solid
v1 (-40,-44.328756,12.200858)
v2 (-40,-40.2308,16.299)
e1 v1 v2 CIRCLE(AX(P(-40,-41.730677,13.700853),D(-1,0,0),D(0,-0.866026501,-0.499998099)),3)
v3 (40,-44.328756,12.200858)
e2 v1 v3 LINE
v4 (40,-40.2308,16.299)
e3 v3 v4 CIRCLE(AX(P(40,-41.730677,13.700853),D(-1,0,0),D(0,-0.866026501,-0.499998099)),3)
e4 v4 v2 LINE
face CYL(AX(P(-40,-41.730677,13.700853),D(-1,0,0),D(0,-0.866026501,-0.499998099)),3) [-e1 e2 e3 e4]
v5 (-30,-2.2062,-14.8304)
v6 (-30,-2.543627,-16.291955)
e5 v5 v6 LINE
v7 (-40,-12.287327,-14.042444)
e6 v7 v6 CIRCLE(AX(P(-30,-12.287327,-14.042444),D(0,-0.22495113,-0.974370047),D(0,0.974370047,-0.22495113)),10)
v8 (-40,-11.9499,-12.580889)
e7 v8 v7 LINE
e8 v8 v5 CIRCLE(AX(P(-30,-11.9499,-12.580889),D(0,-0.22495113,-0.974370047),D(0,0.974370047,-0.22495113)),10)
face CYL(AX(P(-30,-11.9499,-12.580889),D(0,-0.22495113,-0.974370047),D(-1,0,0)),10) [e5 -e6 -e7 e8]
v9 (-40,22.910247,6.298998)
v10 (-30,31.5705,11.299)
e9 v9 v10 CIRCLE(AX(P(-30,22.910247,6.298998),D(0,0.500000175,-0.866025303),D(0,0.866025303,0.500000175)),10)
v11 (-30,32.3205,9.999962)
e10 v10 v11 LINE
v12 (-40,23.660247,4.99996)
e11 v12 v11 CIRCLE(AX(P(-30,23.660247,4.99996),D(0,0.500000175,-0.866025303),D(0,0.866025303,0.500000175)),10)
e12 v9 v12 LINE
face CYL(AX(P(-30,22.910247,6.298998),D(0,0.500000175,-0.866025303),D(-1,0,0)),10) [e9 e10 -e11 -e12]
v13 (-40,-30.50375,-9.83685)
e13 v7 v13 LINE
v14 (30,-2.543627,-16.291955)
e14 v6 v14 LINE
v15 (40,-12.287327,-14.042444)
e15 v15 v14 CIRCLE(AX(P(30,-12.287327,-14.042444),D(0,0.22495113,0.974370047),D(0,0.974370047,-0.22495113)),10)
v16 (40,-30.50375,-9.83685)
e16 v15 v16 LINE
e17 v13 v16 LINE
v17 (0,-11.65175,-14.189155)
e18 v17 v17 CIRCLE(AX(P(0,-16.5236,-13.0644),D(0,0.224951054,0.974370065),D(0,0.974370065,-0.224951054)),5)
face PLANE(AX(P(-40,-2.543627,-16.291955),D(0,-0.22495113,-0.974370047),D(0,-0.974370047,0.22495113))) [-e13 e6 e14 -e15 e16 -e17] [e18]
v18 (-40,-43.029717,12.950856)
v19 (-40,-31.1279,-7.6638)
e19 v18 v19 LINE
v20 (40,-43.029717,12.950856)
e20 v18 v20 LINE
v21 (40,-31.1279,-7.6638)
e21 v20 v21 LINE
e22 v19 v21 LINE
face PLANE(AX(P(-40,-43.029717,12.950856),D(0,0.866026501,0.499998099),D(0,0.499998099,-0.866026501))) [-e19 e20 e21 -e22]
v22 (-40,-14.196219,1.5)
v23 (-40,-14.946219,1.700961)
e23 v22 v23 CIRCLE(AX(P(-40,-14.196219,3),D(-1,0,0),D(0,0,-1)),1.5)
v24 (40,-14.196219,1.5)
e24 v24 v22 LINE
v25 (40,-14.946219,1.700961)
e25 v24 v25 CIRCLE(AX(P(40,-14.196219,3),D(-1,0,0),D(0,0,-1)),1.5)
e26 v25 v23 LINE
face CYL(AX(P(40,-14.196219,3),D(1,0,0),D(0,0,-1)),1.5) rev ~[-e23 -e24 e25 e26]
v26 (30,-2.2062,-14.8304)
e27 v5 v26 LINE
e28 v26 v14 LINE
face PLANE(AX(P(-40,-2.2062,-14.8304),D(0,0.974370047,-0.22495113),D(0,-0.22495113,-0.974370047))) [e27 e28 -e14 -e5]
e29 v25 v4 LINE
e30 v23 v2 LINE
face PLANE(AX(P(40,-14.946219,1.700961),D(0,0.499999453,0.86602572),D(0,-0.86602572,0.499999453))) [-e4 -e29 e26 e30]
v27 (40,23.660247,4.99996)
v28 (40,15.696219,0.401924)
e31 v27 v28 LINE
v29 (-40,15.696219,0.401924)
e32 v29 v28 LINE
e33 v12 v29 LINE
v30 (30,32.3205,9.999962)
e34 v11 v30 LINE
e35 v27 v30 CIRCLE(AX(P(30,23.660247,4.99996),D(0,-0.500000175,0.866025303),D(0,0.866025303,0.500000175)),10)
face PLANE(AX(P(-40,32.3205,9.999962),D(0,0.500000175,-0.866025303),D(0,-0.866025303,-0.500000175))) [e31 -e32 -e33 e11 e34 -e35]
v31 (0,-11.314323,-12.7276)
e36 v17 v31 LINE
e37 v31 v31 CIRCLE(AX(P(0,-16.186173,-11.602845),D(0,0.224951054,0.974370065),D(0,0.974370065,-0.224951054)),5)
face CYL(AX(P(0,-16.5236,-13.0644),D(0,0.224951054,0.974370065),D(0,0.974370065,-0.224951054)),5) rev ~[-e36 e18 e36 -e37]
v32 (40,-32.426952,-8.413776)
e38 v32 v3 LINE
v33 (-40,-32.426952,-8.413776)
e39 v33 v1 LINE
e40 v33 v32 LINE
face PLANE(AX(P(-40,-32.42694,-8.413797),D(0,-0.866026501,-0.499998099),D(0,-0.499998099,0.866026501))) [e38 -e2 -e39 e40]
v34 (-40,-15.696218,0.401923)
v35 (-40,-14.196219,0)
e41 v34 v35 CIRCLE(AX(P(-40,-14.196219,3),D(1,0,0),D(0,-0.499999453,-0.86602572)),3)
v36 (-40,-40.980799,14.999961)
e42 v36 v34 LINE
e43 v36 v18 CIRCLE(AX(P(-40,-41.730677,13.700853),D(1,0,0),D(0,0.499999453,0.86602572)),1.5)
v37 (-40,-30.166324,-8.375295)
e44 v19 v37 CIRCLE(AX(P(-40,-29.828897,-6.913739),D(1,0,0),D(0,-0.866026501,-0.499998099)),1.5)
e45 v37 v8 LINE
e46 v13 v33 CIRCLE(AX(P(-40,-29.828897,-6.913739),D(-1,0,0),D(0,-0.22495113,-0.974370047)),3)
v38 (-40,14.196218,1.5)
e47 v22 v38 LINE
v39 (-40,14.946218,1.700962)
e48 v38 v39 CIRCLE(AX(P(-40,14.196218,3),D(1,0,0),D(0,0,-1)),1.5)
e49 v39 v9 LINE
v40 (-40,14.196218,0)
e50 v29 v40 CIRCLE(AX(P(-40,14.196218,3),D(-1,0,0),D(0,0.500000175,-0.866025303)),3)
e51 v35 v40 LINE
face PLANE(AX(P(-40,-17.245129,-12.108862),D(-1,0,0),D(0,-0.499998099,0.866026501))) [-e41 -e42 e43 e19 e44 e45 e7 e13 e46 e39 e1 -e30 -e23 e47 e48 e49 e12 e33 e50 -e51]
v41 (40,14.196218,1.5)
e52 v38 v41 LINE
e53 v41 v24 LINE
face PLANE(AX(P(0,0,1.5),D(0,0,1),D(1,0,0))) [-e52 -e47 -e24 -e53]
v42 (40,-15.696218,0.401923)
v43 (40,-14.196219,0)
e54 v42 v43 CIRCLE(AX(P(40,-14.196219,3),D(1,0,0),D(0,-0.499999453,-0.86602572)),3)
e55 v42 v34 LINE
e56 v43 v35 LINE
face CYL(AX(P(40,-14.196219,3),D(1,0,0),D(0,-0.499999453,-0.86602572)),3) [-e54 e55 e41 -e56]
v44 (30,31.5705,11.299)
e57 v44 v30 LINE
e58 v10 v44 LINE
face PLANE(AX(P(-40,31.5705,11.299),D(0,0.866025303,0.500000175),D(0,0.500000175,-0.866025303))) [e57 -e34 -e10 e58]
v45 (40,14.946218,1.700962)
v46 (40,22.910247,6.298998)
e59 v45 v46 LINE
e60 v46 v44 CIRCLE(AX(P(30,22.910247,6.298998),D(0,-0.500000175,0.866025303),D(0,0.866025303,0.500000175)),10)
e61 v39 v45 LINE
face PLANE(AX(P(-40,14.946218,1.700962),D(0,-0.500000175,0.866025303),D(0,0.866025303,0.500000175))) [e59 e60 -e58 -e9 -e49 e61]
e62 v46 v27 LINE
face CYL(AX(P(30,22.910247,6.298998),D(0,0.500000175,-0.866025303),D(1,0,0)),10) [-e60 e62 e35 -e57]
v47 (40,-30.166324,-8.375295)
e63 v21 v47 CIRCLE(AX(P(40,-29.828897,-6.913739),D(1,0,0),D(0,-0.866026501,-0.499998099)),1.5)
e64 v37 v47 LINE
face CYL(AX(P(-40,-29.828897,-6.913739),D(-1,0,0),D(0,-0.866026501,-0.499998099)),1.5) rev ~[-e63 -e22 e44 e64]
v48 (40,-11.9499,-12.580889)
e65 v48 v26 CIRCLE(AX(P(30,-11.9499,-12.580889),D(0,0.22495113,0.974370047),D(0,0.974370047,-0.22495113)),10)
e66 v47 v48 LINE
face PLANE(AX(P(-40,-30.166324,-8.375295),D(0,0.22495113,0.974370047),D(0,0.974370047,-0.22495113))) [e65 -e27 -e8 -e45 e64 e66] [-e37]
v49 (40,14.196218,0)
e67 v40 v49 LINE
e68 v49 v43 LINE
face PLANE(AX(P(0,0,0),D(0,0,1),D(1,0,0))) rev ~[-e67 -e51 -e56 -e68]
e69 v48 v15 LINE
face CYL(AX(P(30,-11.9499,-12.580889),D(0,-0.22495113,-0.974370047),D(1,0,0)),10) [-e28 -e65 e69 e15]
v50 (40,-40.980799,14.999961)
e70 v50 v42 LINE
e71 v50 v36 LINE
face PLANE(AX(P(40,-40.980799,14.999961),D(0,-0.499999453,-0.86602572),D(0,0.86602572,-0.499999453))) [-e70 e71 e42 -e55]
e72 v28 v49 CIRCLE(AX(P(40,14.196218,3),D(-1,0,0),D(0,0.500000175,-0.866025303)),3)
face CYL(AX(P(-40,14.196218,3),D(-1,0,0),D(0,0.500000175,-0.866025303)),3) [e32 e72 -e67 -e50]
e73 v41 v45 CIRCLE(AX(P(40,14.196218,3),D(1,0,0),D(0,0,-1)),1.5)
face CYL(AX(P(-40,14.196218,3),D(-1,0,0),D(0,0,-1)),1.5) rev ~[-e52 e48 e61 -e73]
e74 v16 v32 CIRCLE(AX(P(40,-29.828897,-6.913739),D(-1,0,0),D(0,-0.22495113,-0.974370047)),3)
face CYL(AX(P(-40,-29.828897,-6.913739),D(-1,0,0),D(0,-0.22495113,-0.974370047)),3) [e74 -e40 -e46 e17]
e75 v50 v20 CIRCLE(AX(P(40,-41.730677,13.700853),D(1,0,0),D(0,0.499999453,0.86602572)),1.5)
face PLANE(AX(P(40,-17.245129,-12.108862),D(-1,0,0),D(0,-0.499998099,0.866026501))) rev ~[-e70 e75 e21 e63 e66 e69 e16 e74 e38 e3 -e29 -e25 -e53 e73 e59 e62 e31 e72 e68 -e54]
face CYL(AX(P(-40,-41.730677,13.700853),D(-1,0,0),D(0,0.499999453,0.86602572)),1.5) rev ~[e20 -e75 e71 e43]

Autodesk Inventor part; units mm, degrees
ref_plane "YZ Plane" through (0, 0, 0) normal (1, 0, 0) x (0, 1, 0)
ref_plane "XZ Plane" through (0, 0, 0) normal (0, 1, 0) x (-1, 0, 0)
ref_plane "XY Plane" through (0, 0, 0) normal (0, 0, 1) x (1, 0, 0)
sketch "Schizzo1" plane through (0, 0, 0) normal (0, 0, 1) x (1, 0, 0)
  line L0 (-40, 15) -> (40, 15)
  line L1 (40, 15) -> (40, -15)
  line L2 (40, -15) -> (-40, -15)
  line L3 (-40, -15) -> (-40, 15)
  line L4 (-40, 15) -> (40, -15) construction
  line L5 (40, 15) -> (-40, -15) construction
  point P0 (0, 0)
  dimension "d0" = 80
  dimension "d1" = 30
extrude "Piano1" add sketch "Schizzo1" along normal blind 1.5
sketch "Schizzo2" plane through (40, -14.25, 1.299) normal (0, -0.5, -0.8660254) x (1, 0, 0)
  line L0 (-80, 0) -> (0, 0)
  line L1 (0, 0) -> (0, 30)
  line L2 (0, 30) -> (-80, 30)
  line L3 (-80, 30) -> (-80, 0)
edge flange "Flangia1" height 30 angle 30 thickness 1.5 bend radius 1.5 thickness toward (0, -0.5, -0.8660254) relief tear relief width 1.5 relief depth 0.75 edges at (0, -15, 1.5) wall of the first edge with corners at (-40, -14.25, 1.299) (40, -14.25, 1.299) (40, -40.2308, 16.299) (-40, -40.2308, 16.299)
bend "Piega (Bend)1"
corner "Angolo1"
sketch "Schizzo3" plane through (-40, 14.25, 1.299) normal (0, 0.5, -0.8660254) x (-1, 0, 0)
  line L0 (-80, 0) -> (0, 0)
  line L1 (0, 0) -> (0, 20)
  line L2 (0, 20) -> (-80, 20)
  line L3 (-80, 20) -> (-80, 0)
edge flange "Flangia2" height 20 angle 30 thickness 1.5 bend radius 1.5 thickness toward (0, 0.5, -0.8660254) relief tear relief width 1.5 relief depth 0.75 edges at (0, 15, 1.5) wall of the first edge with corners at (40, 14.25, 1.299) (-40, 14.25, 1.299) (-40, 31.5705, 11.299) (40, 31.5705, 11.299)
bend "Piega (Bend)2"
corner "Angolo2"
sketch "Schizzo4" plane through (-40, -43.0298, 12.951) normal (0, -0.8660254, -0.5) x (1, 0, 0)
  line L0 (80, 0) -> (0, 0)
  line L1 (0, 0) -> (0, -23.8038)
  line L2 (0, -23.8038) -> (80, -23.8038)
  line L3 (80, -23.8038) -> (80, 0)
edge flange "Flangia3" height 35 angle 150 thickness 1.5 bend radius 1.5 thickness toward (0, -0.8660254, -0.5) relief tear relief width 1.5 relief depth 0.75 edges at (0, -40.9808, 15) wall of the first edge with corners at (40, -43.0298, 12.951) (-40, -43.0298, 12.951) (-40, -31.1279, -7.6638) (40, -31.1279, -7.6638)
bend "Piega (Bend)3"
corner "Angolo3"
sketch "Schizzo6" plane through (-40, -30.1663, -8.3753) normal (0, -0.2249511, -0.9743701) x (1, 0, 0)
  line L0 (80, 0) -> (0, 0)
  line L1 (0, 0) -> (0, -28.6956)
  line L2 (0, -28.6956) -> (80, -28.6956)
  line L3 (80, -28.6956) -> (80, 0)
edge flange "Flangia5" height 30 angle 47 thickness 1.5 bend radius 1.5 thickness toward (0, -0.2249511, -0.9743701) relief tear relief width 1.5 relief depth 0.75 edges at (0, -31.1279, -7.6638) wall of the first edge with corners at (40, -30.1663, -8.3753) (-40, -30.1663, -8.3753) (-40, -2.2062, -14.8304) (40, -2.2062, -14.8304)
bend "Piega (Bend)5"
corner "Angolo5"
sketch "Schizzo7" plane through (40, -2.5436, -16.292) normal (0, -0.2249511, -0.9743701) x (-1, 0, 0)
  line L0 (80, 0) -> (80, -28.6956) projected
  line L1 (0, 0) -> (80, 0) projected
  point P0 (40, -1.1865)
  point P1 (40, -14.3478)
  point P2 (80, -14.3478)
  point P3 (40, 0)
hole "Foro1" at (0, -16.5236, -13.0644) direction (0, 0.2249511, 0.9743701) diameter 10 depth 1.5 tip angle 118
fillet "Arrotondamento angolo1" radius 10 4 edges at (-40, 31.9455, 10.6495) (40, 31.9455, 10.6495) (40, -2.3749, -15.5612) (-40, -2.3749, -15.5612)
equation "\"d58\" = Spessore"
equation "\"d2\" = Spessore"
equation "\"d3\" = LarghezzaScaricoPiega"
equation "\"d4\" = ProfonditàScaricoPiega"
equation "\"d5\" = ResiduoMinimo"
equation "\"d6\" = RaggioTransizione"
equation "\"d9\" = RaggioPiega"
equation "\"d10\" = DimensioniScaricoAngolo"
equation "\"d11\" = DimensioneGioco"
equation "\"d12\" = Dimensione_raggio_Jacobi"
equation "\"d13\" = LarghezzaScaricoPiega"
equation "\"d14\" = ProfonditàScaricoPiega"
equation "\"d15\" = ResiduoMinimo"
equation "\"d16\" = RaggioTransizione"
equation "\"d19\" = RaggioPiega"
equation "\"d20\" = DimensioniScaricoAngolo"
equation "\"d21\" = DimensioneGioco"
equation "\"d22\" = Dimensione_raggio_Jacobi"
equation "\"d23\" = LarghezzaScaricoPiega"
equation "\"d24\" = ProfonditàScaricoPiega"
equation "\"d25\" = ResiduoMinimo"
equation "\"d26\" = RaggioTransizione"
equation "\"d29\" = RaggioPiega"
equation "\"d30\" = DimensioniScaricoAngolo"
equation "\"d31\" = DimensioneGioco"
equation "\"d32\" = Dimensione_raggio_Jacobi"
equation "\"d43\" = LarghezzaScaricoPiega"
equation "\"d44\" = ProfonditàScaricoPiega"
equation "\"d45\" = ResiduoMinimo"
equation "\"d46\" = RaggioTransizione"
equation "\"d49\" = RaggioPiega"
equation "\"d50\" = DimensioniScaricoAngolo"
equation "\"d51\" = DimensioneGioco"
equation "\"d52\" = Dimensione_raggio_Jacobi"
equation "\"RaggioPiega\" = Spessore"
equation "\"LarghezzaScaricoPiega\" = Spessore"
equation "\"ProfonditàScaricoPiega\" = 0.5 * Spessore"
equation "\"DimensioniScaricoAngolo\" = 4 * Spessore"
equation "\"ResiduoMinimo\" = 2 * Spessore"
equation "\"RaggioTransizione\" = RaggioPiega"
equation "\"Dimensione_raggio_Jacobi\" = RaggioPiega"
equation "\"DimensioneGioco\" = Spessore"
equation "\"Spessore\" = 1.5"
properties part number "Lamiera pinza"
